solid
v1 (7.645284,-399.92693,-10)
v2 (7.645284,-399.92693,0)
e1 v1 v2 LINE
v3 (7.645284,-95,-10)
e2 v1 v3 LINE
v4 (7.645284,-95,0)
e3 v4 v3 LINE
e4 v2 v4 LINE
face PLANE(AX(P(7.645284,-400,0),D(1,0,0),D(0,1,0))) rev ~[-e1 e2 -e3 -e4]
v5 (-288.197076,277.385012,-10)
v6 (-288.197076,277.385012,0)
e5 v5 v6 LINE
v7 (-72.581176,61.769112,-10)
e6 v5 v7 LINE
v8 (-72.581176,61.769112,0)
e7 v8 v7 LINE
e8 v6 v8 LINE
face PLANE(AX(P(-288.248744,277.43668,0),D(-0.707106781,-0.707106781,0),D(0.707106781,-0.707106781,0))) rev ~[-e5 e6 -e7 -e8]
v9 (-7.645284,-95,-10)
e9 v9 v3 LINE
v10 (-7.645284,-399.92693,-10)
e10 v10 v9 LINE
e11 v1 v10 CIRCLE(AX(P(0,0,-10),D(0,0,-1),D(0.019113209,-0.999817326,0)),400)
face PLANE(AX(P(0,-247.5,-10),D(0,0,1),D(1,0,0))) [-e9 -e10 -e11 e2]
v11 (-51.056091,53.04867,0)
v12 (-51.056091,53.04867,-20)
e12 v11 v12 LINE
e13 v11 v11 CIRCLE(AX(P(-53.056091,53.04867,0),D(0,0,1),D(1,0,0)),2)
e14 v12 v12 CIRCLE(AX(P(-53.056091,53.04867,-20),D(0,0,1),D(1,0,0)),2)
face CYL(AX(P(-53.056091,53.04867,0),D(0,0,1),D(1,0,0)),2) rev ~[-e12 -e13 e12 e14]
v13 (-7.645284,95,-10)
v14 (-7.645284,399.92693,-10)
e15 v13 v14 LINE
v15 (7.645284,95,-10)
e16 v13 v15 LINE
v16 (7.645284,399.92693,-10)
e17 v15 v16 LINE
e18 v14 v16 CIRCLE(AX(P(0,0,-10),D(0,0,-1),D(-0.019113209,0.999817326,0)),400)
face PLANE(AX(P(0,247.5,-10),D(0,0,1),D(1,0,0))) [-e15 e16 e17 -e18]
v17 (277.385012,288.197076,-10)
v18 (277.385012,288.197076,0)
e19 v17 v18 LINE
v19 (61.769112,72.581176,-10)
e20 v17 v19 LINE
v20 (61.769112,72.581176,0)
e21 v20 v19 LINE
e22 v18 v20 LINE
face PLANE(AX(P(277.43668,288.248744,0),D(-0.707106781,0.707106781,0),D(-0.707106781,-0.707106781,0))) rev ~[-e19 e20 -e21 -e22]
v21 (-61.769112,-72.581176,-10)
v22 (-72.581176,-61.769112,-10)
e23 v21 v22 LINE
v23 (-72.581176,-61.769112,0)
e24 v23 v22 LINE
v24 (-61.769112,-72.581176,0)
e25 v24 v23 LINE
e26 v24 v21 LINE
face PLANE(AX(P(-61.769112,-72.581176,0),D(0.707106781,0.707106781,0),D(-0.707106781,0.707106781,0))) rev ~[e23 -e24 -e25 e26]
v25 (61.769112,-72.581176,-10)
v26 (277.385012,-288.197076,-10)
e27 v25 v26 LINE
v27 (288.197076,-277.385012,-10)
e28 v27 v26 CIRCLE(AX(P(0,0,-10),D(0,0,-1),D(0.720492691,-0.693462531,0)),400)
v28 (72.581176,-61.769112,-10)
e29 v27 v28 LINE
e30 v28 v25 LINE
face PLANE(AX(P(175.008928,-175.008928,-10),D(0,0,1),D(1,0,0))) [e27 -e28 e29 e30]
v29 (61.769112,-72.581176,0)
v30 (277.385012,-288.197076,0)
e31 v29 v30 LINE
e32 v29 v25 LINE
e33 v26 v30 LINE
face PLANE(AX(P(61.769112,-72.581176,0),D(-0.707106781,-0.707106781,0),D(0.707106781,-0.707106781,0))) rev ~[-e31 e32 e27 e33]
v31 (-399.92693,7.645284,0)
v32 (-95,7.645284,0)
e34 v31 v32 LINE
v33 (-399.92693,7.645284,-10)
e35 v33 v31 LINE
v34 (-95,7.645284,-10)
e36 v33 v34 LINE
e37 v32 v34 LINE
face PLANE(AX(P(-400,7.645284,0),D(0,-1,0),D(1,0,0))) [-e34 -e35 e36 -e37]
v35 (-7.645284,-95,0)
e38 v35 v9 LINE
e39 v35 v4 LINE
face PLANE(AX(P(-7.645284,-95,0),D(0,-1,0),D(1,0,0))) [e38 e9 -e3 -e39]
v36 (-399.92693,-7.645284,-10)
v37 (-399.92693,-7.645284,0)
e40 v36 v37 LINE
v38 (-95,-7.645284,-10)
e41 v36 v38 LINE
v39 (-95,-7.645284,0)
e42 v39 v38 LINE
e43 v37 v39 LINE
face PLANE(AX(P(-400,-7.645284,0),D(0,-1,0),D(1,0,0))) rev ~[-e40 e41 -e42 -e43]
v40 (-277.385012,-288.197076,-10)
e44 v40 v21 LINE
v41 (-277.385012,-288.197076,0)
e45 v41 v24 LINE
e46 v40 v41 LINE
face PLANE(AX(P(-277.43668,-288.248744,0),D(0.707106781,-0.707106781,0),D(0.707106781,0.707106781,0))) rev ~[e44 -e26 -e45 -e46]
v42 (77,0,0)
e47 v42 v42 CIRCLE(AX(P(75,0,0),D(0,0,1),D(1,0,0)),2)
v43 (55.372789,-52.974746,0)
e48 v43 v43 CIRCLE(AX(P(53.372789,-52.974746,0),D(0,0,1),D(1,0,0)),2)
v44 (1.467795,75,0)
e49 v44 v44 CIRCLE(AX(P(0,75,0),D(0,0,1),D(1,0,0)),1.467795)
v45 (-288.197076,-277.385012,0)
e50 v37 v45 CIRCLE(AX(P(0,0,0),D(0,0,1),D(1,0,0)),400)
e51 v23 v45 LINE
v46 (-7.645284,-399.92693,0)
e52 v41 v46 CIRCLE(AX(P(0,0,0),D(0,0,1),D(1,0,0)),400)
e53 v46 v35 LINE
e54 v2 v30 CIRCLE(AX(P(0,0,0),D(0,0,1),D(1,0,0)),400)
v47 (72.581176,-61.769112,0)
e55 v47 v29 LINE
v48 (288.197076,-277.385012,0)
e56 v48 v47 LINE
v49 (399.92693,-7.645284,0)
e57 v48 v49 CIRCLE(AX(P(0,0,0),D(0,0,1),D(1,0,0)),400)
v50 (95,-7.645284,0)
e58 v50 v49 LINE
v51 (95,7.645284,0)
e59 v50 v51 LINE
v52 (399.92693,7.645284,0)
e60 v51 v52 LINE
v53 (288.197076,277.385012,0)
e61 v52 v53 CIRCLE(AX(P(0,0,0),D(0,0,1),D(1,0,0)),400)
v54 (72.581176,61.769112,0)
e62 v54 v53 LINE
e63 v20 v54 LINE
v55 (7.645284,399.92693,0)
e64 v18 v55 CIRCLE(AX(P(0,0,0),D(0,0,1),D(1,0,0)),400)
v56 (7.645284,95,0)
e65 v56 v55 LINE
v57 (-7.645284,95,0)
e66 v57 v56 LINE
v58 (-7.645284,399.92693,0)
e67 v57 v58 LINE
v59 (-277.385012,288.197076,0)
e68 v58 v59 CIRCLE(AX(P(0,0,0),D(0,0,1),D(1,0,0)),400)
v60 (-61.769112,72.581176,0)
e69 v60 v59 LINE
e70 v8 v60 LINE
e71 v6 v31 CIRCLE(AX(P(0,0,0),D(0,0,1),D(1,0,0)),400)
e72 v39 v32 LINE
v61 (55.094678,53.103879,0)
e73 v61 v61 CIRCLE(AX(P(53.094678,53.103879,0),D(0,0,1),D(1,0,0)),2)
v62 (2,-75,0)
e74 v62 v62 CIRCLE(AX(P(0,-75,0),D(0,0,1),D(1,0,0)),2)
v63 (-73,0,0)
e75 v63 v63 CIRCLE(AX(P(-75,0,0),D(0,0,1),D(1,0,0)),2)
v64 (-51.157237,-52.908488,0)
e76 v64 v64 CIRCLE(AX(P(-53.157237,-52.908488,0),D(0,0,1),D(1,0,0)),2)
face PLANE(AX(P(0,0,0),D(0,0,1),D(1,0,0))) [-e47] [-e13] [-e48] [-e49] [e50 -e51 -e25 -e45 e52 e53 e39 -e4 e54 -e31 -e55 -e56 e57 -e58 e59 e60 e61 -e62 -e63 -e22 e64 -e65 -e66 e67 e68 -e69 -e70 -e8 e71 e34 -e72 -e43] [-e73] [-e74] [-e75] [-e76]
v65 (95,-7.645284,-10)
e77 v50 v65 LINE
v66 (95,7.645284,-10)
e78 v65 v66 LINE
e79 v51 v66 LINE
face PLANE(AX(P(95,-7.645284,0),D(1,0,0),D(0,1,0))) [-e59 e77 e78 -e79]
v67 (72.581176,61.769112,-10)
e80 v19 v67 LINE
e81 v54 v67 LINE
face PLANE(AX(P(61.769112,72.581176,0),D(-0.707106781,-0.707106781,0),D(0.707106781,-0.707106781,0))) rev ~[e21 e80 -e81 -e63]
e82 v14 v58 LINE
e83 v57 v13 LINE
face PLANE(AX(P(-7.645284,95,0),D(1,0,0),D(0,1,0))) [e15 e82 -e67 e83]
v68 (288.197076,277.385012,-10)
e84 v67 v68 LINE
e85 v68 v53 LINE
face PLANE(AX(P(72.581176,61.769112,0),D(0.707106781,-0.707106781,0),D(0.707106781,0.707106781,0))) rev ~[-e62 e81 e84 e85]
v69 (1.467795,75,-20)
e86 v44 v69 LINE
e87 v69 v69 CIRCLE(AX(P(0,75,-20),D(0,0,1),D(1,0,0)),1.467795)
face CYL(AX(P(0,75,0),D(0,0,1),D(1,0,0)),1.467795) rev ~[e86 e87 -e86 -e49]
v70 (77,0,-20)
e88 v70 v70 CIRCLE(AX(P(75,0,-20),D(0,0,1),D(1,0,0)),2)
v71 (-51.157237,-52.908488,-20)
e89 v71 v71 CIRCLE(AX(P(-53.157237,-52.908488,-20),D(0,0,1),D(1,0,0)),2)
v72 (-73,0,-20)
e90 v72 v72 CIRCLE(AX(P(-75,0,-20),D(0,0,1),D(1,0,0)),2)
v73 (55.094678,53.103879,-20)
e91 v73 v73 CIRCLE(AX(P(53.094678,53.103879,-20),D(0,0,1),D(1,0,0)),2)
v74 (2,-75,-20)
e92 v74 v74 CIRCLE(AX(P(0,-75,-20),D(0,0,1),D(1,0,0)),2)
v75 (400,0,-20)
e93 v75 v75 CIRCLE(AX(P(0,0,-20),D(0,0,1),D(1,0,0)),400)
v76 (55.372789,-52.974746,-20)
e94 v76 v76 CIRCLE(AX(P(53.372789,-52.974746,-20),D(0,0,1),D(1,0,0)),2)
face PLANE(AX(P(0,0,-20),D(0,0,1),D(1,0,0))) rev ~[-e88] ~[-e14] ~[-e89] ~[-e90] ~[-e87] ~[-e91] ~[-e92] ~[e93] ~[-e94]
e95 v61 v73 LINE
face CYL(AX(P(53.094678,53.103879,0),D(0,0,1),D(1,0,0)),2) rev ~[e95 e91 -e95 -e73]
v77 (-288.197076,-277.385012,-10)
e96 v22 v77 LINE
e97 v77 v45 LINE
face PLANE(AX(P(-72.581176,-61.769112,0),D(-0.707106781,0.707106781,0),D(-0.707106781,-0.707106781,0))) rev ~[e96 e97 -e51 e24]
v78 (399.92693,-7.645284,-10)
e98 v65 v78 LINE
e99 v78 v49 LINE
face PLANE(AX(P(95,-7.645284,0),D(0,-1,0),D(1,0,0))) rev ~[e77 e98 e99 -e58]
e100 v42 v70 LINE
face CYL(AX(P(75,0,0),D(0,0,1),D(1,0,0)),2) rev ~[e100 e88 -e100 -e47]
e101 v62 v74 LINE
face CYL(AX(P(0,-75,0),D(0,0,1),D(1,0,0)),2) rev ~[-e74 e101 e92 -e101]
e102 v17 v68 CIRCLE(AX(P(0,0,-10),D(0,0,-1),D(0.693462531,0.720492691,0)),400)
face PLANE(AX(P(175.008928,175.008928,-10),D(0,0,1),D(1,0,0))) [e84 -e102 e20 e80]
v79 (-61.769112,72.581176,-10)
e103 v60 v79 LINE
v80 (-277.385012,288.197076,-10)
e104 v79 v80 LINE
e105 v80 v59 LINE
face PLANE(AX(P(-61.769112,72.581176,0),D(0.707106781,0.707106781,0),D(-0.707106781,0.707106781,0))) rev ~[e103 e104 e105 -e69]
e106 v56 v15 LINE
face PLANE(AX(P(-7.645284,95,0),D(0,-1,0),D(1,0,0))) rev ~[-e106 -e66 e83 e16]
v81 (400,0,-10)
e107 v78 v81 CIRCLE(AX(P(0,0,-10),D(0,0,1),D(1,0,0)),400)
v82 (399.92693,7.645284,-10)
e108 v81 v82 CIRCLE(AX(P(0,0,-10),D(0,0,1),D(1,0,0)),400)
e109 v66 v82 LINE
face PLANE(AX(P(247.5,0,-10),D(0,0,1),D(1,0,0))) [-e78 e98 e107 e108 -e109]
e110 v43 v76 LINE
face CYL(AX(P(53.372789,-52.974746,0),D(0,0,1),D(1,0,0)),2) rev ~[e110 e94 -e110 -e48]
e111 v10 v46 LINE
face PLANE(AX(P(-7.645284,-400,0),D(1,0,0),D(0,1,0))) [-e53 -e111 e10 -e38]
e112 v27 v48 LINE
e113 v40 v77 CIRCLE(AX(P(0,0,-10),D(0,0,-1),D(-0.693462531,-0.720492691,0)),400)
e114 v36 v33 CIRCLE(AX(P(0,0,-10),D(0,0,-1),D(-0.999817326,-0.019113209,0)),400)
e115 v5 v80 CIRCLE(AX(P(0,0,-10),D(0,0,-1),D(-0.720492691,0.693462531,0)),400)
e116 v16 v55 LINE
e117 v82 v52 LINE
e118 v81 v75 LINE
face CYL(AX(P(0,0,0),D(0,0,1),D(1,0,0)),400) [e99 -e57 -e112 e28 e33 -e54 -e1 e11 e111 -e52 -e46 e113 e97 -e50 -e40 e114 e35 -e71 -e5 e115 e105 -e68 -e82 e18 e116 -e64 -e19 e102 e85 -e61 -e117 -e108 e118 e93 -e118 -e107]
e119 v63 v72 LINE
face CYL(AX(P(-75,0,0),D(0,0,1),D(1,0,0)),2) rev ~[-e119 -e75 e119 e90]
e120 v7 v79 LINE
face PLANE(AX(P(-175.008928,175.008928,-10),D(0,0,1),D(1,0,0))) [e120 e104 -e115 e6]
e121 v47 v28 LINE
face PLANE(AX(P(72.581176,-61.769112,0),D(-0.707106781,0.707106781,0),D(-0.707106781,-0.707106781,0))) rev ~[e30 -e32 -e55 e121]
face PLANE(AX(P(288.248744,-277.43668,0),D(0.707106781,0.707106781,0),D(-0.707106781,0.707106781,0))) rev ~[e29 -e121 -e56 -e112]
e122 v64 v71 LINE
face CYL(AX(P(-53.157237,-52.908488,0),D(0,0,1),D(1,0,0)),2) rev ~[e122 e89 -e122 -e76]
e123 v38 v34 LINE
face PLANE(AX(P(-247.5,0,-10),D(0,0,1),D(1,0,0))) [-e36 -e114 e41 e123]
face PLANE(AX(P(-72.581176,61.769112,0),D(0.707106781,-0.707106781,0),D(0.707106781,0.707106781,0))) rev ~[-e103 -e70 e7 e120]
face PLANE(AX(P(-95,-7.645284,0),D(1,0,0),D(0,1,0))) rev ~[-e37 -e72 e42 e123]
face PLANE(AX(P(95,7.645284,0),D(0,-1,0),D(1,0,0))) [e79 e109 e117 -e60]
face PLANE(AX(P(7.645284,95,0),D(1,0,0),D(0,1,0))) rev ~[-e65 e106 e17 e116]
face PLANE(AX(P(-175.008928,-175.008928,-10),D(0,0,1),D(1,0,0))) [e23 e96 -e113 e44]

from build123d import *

# Parameters (mm, degrees)
F0_R      = 400
F1_DEPTH  = 20
F3_R      = 2
F4_DEPTH  = 20
F5_R      = 2
F6_DEPTH  = 20
F8_R      = 2
F9_DEPTH  = 20
F10_R     = 2
F11_DEPTH = 20
F12_R     = 2
F13_DEPTH = 20
F14_R     = 2
F15_DEPTH = 20
F16_R     = 1.4677946232
F17_DEPTH = 20
F18_R     = 2
F19_DEPTH = 20
F20_W     = 15.2905675913
F20_H     = 305
F20_W_2   = 305
F20_H_2   = 15.2905675913
F21_DEPTH = 10


with BuildPart() as f1:
    # F0 (on Top) → F1 (new body)
    with BuildSketch(Plane.XY):
        Circle(F0_R)
    extrude(amount=-F1_DEPTH)

    # F3 (on Top) → F4 (cut)
    with BuildSketch(Plane.XY):
        with Locations((-75, 0)):
            Circle(F3_R)
    extrude(amount=-F4_DEPTH, mode=Mode.SUBTRACT)

    # F5 (on Top) → F6 (cut)
    with BuildSketch(Plane.XY):
        with Locations((-53.1572374294, -52.9084880607)):
            Circle(F5_R)
    extrude(amount=-F6_DEPTH, mode=Mode.SUBTRACT)

    # F8 (on offset) → F9 (cut)
    with BuildSketch(Plane.XY):
        with Locations((0, -75)):
            Circle(F8_R)
    extrude(amount=-F9_DEPTH, mode=Mode.SUBTRACT)

    # F10 (on offset) → F11 (cut)
    with BuildSketch(Plane.XY):
        with Locations((53.3727891743, -52.9747456312)):
            Circle(F10_R)
    extrude(amount=-F11_DEPTH, mode=Mode.SUBTRACT)

    # F12 (on offset) → F13 (cut)
    with BuildSketch(Plane.XY):
        with Locations((75, 0)):
            Circle(F12_R)
    extrude(amount=-F13_DEPTH, mode=Mode.SUBTRACT)

    # F14 (on offset) → F15 (cut)
    with BuildSketch(Plane.XY):
        with Locations((53.0946776271, 53.1038790941)):
            Circle(F14_R)
    extrude(amount=-F15_DEPTH, mode=Mode.SUBTRACT)

    # F16 (on offset) → F17 (cut)
    with BuildSketch(Plane.XY):
        with Locations((0, 75)):
            Circle(F16_R)
    extrude(amount=-F17_DEPTH, mode=Mode.SUBTRACT)

    # F18 (on offset) → F19 (cut)
    with BuildSketch(Plane.XY):
        with Locations((-53.0560910702, 53.0486702919)):
            Circle(F18_R)
    extrude(amount=-F19_DEPTH, mode=Mode.SUBTRACT)

    # F20 (on offset) → F21 (cut)
    with BuildSketch(Plane.XY):
        with Locations((0, -247.5)):
            Rectangle(F20_W, F20_H)
        Polygon((288.2487444906, -277.4366804586), (72.5811762287, -61.7691121967), (61.7691121967, -72.5811762287), (277.4366804586, -288.2487444906), align=None)
        with Locations((247.5, 0)):
            Rectangle(F20_W_2, F20_H_2)
        Polygon((277.4366804586, 288.2487444906), (61.7691121967, 72.5811762287), (72.5811762287, 61.7691121967), (288.2487444906, 277.4366804586), align=None)
        with Locations((0, 247.5)):
            Rectangle(F20_W, F20_H)
        Polygon((-288.2487444906, 277.4366804586), (-72.5811762287, 61.7691121967), (-61.7691121967, 72.5811762287), (-277.4366804586, 288.2487444906), align=None)
        with Locations((-247.5, 0)):
            Rectangle(F20_W_2, F20_H_2)
        Polygon((-277.4366804586, -288.2487444906), (-61.7691121967, -72.5811762287), (-72.5811762287, -61.7691121967), (-288.2487444906, -277.4366804586), align=None)
    extrude(amount=-F21_DEPTH, mode=Mode.SUBTRACT)


solid = f1.part
